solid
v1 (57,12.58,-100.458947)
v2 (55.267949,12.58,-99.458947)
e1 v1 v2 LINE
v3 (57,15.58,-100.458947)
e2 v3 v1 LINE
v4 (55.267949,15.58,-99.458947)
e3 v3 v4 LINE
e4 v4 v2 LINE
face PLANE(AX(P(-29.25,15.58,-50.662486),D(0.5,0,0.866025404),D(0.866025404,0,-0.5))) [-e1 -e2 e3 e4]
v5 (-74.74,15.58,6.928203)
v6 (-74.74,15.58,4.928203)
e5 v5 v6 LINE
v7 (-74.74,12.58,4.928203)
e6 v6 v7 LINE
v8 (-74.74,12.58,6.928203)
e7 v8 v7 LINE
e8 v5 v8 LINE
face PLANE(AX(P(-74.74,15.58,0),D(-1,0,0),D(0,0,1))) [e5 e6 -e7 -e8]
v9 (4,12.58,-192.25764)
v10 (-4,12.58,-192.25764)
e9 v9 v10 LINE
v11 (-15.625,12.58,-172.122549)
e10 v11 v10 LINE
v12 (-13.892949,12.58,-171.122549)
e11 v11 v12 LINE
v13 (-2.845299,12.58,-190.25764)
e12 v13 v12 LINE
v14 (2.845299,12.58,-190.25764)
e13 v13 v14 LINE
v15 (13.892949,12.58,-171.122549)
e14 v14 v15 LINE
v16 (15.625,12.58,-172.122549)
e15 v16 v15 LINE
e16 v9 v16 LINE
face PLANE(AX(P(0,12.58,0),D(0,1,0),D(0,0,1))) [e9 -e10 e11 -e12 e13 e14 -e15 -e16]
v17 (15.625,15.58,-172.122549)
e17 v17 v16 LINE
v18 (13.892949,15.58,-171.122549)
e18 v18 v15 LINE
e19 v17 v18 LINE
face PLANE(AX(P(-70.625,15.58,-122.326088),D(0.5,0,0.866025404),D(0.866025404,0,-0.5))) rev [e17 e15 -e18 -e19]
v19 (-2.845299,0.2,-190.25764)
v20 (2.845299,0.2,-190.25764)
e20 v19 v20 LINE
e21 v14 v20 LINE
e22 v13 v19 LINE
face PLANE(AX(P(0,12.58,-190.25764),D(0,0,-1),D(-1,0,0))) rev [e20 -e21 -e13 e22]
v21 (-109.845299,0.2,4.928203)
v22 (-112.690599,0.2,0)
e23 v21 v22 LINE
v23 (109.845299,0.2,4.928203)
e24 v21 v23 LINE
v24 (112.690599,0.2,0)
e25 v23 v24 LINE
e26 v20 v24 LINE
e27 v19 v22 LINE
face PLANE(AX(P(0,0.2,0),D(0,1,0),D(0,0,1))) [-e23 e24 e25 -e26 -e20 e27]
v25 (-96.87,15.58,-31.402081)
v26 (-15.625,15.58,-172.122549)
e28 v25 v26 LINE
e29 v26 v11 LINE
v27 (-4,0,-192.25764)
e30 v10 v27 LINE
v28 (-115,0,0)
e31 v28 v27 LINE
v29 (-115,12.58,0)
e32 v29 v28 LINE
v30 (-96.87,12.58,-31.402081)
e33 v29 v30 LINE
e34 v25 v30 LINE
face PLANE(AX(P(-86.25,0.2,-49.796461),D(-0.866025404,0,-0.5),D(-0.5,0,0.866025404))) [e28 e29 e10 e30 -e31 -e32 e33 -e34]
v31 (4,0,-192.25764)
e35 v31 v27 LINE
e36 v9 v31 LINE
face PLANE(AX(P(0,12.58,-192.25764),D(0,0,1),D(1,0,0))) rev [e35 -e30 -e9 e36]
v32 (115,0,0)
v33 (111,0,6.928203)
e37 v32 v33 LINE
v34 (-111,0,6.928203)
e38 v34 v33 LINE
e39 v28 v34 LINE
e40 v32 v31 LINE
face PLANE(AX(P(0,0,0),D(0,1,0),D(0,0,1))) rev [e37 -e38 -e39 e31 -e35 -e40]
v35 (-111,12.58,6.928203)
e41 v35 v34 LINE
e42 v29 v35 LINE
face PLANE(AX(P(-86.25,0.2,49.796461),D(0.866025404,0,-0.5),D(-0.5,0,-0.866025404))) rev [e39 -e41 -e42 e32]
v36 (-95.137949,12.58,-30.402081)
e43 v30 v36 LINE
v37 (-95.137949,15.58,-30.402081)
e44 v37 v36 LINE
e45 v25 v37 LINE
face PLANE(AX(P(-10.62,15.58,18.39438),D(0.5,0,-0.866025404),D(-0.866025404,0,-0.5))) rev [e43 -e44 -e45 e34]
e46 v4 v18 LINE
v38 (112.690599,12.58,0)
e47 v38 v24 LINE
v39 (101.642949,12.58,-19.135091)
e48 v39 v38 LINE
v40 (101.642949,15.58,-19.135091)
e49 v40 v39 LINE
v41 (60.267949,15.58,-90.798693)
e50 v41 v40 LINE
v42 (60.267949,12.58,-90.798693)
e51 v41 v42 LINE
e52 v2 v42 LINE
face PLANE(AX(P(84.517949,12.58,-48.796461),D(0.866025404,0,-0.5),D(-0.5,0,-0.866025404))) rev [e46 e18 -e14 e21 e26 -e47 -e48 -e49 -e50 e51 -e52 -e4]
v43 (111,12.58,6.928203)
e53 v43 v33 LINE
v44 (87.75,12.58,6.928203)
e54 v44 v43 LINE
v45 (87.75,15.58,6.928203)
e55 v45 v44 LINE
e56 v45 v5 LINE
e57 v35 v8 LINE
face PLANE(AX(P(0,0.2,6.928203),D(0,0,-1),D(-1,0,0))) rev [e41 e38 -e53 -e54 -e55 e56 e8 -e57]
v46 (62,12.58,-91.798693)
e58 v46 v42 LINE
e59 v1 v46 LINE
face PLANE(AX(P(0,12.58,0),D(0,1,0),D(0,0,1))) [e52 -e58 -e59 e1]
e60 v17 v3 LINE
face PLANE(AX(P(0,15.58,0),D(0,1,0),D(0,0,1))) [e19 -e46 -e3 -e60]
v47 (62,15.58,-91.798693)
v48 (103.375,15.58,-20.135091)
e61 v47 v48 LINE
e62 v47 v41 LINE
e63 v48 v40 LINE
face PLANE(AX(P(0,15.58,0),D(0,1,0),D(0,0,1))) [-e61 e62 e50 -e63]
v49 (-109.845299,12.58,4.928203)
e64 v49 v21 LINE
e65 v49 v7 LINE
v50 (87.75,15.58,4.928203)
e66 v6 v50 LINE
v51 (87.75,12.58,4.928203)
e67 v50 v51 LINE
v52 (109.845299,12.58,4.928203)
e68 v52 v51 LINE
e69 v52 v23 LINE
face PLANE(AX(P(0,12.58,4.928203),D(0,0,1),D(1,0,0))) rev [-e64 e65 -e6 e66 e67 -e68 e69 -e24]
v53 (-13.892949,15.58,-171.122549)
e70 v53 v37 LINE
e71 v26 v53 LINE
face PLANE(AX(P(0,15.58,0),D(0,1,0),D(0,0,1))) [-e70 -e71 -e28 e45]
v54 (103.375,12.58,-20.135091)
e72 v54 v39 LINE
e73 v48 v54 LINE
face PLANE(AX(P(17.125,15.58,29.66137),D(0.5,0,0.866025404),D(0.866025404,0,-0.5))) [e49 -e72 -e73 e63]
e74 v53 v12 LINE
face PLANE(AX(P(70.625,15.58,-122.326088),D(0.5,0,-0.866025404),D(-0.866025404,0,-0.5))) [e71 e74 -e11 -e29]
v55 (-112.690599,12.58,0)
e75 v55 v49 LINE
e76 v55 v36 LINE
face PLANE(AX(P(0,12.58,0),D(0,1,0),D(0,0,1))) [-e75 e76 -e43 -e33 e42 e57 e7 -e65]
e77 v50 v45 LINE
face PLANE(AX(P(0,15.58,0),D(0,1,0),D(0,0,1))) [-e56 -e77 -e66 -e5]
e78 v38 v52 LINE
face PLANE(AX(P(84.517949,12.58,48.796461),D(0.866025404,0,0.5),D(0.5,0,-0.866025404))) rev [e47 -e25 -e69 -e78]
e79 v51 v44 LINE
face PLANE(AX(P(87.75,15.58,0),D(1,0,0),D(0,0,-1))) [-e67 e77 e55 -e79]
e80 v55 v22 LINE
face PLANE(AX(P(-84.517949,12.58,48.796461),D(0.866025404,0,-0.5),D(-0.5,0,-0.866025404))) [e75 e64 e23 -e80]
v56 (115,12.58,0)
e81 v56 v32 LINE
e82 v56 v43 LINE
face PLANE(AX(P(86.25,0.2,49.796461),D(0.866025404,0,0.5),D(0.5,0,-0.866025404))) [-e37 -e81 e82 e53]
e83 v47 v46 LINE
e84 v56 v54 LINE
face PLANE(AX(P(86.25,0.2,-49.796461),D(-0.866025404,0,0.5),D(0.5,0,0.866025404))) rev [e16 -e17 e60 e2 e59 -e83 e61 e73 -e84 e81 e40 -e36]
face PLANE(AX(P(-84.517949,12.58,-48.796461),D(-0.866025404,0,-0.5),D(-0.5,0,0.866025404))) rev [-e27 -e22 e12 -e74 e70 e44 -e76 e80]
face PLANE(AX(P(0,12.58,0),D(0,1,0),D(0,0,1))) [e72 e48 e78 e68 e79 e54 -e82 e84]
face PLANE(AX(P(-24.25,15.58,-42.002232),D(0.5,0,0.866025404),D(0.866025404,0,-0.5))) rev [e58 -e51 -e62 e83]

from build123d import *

# Parameters (mm, degrees)
BOSS_EXTRUDE1_DEPTH = 0.2
BOSS_EXTRUDE2_DEPTH = 12.58
SKETCH1_4_W         = 162.49
SKETCH1_4_H         = 2
BOSS_EXTRUDE3_DEPTH = 15.58


# Read off the part's stored shape, not the designer's step: Boss-Extrude2
with BuildPart() as part:
    # Sketch1 → Boss-Extrude1 (new body)
    with BuildSketch(Plane(origin=(0, 0, 0), x_dir=(1, 0, 0), z_dir=(0, 1, 0))):
        Polygon((-115, 0), (-111, -6.92820323), (111, -6.92820323), (115, 0), (15.625, 172.122549002), (13.892949192, 171.122549002), (2.845299462, 190.25763964), (-2.845299462, 190.25763964), (-13.892949192, 171.122549002), (-15.625, 172.122549002), align=None)
    extrude(amount=BOSS_EXTRUDE1_DEPTH)

    # Boss-Extrude2 outline → Boss-Extrude2 (add)
    with BuildSketch(Plane(origin=(0, 0, 0), x_dir=(1, 0, 0), z_dir=(0, 1, 0))):
        Polygon((15.625, 172.122549002), (4, 192.25763964), (-4, 192.25763964), (-15.625, 172.122549002), (-13.892949192, 171.122549002), (-2.845299462, 190.25763964), (2.845299462, 190.25763964), (13.892949192, 171.122549002), align=None)
        Polygon((62, 91.798692801), (57, 100.458946839), (55.267949192, 99.458946839), (60.267949192, 90.798692801), align=None)
        Polygon((-95.137949192, 30.402081141), (-96.87, 31.402081141), (-115, 0), (-111, -6.92820323), (-74.74, -6.92820323), (-74.74, -4.92820323), (-109.845299462, -4.92820323), (-112.690598923, 0), align=None)
        Polygon((115, 0), (103.375, 20.135090638), (101.642949192, 19.135090638), (112.690598923, 0), (109.845299462, -4.92820323), (87.75, -4.92820323), (87.75, -6.92820323), (111, -6.92820323), align=None)
    extrude(amount=BOSS_EXTRUDE2_DEPTH)

    # Sketch1<4> → Boss-Extrude3 (add)
    with BuildSketch(Plane(origin=(0, 0, 0), x_dir=(1, 0, 0), z_dir=(0, 1, 0))):
        Polygon((-15.625, 172.122549002), (-96.87, 31.402081141), (-95.137949192, 30.402081141), (-13.892949192, 171.122549002), align=None)
        with Locations((6.505, -5.92820323)):
            Rectangle(SKETCH1_4_W, SKETCH1_4_H)
        Polygon((57, 100.458946839), (15.625, 172.122549002), (13.892949192, 171.122549002), (55.267949192, 99.458946839), align=None)
        Polygon((101.642949192, 19.135090638), (103.375, 20.135090638), (62, 91.798692801), (60.267949192, 90.798692801), align=None)
    extrude(amount=BOSS_EXTRUDE3_DEPTH)


solid = part.part
